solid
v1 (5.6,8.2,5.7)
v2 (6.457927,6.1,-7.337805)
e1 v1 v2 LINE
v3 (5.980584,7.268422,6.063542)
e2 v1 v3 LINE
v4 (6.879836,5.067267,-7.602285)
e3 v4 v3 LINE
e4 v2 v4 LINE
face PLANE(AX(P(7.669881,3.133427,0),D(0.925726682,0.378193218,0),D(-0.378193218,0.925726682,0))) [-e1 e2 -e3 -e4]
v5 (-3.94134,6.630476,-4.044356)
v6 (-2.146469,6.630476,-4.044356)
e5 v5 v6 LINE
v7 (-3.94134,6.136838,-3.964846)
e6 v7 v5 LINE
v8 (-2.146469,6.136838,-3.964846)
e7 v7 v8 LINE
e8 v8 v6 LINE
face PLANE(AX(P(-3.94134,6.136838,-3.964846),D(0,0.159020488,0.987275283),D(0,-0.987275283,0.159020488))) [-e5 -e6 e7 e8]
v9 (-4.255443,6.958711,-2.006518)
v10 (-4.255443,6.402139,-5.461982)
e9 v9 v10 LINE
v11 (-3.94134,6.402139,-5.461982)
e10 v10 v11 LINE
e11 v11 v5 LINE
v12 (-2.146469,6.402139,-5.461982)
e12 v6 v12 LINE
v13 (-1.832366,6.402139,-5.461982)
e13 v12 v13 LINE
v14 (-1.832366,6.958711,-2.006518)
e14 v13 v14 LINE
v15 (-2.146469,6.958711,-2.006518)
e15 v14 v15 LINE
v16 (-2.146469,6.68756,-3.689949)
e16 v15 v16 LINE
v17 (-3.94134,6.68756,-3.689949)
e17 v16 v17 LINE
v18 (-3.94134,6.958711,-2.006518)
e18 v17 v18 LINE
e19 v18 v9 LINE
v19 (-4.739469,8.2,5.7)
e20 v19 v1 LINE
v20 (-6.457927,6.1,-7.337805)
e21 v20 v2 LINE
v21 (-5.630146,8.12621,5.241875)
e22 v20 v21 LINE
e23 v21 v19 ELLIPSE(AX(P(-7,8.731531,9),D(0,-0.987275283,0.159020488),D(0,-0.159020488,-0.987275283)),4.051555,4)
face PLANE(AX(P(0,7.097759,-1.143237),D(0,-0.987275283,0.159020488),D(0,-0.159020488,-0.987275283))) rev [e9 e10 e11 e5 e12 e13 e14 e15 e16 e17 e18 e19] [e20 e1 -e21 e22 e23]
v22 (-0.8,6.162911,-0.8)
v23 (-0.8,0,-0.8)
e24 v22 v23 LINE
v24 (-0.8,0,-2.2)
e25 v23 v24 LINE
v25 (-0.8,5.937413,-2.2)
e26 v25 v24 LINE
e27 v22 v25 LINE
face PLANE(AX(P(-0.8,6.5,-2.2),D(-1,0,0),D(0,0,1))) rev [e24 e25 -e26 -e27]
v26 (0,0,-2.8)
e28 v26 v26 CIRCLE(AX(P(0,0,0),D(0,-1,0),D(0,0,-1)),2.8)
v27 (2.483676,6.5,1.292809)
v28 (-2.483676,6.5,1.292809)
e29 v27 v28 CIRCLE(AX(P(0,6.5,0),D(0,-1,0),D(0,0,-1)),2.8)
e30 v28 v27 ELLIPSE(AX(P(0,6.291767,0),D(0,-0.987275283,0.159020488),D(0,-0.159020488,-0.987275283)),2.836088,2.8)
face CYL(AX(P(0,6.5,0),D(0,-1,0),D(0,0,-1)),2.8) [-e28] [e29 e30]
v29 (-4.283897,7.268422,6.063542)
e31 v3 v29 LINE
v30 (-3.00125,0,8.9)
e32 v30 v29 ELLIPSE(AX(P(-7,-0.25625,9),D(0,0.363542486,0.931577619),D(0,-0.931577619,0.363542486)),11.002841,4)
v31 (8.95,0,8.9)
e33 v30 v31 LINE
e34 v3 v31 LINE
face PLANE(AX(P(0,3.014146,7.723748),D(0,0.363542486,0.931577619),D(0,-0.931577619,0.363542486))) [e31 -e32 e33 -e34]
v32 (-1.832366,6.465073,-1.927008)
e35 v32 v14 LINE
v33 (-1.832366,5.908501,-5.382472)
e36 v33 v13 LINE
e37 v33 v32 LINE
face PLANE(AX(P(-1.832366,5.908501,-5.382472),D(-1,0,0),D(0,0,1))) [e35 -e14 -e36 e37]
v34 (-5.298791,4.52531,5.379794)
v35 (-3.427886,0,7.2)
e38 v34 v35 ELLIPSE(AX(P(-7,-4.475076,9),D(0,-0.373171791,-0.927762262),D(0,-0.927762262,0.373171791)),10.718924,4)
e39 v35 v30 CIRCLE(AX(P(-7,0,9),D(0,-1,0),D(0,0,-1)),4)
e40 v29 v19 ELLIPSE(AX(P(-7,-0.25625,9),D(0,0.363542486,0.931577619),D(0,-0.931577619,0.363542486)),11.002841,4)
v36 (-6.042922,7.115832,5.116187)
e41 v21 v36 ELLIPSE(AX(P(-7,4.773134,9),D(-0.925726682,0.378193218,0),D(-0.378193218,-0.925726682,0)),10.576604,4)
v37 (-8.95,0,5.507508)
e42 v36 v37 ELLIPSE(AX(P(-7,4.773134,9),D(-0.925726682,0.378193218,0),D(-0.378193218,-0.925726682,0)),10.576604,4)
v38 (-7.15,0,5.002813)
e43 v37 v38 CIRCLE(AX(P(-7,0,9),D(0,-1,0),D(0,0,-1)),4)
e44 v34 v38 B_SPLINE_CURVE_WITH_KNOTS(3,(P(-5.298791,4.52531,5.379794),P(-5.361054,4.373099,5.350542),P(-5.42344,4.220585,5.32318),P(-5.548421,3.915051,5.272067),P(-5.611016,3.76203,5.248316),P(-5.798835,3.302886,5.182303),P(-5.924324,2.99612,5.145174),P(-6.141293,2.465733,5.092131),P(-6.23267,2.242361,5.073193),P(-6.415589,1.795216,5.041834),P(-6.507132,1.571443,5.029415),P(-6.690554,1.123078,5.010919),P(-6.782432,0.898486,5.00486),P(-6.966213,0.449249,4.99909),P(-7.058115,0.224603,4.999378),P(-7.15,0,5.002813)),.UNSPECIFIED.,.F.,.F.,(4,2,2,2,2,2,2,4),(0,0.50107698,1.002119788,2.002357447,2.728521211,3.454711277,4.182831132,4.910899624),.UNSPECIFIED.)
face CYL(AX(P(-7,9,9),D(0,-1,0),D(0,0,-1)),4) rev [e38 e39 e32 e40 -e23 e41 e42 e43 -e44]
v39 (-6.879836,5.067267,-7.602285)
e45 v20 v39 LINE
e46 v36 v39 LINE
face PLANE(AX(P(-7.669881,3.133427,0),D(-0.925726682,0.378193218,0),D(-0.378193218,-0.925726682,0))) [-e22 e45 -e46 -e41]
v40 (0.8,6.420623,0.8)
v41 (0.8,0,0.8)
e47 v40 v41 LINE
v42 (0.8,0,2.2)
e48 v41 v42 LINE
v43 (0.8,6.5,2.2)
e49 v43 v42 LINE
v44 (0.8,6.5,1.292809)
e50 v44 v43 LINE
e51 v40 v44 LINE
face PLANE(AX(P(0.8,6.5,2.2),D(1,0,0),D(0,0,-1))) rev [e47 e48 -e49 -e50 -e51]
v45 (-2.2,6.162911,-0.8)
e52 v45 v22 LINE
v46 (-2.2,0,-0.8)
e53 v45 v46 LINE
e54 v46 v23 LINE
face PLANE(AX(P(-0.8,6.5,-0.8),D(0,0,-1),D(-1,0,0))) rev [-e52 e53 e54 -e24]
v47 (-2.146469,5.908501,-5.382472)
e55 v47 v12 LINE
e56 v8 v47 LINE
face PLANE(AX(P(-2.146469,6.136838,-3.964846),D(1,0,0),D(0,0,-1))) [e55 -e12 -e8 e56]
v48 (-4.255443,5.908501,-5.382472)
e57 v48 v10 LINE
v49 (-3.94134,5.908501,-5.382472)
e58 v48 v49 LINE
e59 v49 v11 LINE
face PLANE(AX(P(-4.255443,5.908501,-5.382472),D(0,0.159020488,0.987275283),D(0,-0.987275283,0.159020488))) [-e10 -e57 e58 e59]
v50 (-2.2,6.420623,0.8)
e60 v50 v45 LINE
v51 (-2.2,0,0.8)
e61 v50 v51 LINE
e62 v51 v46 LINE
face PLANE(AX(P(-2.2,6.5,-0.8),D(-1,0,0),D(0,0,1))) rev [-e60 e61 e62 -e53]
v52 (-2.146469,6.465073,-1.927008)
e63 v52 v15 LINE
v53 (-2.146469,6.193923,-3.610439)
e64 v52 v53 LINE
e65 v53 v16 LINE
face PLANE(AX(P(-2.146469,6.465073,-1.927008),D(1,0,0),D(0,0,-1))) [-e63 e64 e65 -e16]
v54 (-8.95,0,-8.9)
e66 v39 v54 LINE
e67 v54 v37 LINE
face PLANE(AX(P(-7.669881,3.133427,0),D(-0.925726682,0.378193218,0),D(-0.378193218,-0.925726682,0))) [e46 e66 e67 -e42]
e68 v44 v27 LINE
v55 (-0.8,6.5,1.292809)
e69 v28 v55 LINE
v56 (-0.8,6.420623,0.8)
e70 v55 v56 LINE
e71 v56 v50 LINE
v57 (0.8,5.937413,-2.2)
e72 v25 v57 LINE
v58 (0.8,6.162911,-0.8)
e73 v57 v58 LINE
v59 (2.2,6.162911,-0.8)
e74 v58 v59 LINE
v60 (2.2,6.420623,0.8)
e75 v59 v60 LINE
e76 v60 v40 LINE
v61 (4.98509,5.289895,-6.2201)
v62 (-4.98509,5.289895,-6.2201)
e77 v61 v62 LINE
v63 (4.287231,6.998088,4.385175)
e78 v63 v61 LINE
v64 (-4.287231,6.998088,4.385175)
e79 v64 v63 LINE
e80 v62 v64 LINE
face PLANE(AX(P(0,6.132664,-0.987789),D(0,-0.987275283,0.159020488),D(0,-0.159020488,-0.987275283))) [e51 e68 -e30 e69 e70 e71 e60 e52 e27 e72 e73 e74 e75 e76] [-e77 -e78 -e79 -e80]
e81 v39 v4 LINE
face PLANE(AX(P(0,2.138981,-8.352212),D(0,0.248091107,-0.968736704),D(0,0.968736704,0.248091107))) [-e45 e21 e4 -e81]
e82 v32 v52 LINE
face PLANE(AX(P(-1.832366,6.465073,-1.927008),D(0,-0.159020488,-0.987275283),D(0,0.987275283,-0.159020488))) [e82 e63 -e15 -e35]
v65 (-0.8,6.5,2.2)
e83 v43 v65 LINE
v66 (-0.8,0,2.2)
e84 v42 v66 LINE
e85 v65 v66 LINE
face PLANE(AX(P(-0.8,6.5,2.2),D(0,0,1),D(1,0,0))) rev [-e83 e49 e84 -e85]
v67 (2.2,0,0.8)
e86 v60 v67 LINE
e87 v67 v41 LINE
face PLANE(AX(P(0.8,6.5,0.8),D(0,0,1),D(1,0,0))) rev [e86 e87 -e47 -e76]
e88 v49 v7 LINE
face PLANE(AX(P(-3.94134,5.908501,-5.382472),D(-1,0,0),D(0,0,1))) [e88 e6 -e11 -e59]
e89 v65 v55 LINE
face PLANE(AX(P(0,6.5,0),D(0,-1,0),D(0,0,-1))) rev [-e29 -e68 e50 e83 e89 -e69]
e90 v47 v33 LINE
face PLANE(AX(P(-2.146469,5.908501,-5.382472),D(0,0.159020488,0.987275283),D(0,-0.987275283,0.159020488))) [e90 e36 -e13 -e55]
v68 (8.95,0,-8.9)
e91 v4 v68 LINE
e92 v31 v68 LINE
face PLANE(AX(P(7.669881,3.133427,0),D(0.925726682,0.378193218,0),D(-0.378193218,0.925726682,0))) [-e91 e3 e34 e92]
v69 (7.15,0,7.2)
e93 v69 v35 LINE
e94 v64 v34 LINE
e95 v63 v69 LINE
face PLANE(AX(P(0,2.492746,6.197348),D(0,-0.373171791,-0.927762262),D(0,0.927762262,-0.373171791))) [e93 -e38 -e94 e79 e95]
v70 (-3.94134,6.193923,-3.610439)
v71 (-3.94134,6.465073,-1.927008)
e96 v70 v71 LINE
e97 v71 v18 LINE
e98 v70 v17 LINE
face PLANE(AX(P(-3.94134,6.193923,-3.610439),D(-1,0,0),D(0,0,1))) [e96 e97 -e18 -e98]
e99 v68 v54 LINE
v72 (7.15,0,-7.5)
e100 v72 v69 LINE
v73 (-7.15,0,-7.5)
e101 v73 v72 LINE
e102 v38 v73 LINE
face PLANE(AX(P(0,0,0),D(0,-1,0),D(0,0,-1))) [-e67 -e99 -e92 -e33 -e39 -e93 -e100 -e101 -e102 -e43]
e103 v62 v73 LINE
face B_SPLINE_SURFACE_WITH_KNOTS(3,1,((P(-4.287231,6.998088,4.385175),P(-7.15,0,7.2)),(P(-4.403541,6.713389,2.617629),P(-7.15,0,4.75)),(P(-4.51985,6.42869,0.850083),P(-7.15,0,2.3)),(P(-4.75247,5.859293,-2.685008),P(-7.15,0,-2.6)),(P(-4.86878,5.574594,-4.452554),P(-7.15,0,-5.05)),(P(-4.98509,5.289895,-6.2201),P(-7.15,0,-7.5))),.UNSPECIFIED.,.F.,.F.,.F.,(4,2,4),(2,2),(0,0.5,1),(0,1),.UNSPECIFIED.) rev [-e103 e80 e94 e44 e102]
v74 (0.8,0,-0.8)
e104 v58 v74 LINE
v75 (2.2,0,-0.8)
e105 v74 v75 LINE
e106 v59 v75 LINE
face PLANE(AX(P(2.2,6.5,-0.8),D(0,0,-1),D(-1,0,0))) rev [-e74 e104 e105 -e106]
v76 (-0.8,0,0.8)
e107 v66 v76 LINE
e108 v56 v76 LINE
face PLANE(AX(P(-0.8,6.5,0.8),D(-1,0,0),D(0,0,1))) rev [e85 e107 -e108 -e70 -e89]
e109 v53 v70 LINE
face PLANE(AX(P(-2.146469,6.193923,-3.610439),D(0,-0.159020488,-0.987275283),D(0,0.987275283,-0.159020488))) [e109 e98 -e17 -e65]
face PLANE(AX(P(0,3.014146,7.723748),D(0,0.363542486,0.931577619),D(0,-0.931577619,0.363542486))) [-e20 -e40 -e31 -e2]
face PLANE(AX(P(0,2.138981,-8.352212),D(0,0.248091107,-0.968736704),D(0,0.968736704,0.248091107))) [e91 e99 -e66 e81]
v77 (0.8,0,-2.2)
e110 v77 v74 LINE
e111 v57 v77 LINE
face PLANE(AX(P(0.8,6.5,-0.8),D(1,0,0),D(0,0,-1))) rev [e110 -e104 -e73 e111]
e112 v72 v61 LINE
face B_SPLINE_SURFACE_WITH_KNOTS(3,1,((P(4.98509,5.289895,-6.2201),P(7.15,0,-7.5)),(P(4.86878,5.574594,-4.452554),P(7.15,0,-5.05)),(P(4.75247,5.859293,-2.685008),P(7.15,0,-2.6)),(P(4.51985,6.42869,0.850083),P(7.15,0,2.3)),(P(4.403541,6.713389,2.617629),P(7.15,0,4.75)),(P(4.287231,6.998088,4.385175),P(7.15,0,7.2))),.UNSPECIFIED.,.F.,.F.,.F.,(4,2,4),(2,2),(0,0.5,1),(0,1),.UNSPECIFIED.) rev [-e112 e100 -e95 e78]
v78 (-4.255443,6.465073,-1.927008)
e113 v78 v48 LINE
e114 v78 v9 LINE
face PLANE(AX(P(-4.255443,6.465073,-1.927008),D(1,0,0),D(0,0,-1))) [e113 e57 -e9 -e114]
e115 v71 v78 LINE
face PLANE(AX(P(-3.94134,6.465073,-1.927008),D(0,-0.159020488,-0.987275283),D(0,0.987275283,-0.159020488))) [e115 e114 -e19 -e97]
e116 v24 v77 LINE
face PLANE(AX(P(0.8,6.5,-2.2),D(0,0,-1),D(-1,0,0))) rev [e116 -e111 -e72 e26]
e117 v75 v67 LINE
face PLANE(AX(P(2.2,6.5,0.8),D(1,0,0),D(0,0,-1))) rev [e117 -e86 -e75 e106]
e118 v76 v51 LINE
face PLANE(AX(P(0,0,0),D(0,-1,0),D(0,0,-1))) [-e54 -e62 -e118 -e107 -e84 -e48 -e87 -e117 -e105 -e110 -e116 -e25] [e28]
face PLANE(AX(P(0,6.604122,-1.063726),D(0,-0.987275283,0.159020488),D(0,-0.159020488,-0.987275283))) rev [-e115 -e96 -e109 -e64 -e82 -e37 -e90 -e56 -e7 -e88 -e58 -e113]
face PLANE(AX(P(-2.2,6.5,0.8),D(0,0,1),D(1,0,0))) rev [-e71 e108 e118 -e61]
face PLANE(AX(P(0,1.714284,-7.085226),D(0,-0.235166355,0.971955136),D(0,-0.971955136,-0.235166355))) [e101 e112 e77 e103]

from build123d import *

# Parameters (mm, degrees)
OTHER_START         = 7.189240539
OTHER_2_OUTLINE_W   = 16
OTHER_2_OUTLINE_H   = 16
OTHER_2_DEPTH       = 1.9877561
SKETCH_20_R         = 2.8
EXTRUDE_2_DEPTH     = 6.5
SKETCH_22_R         = 4
CUT_EXTRUDE_2_DEPTH = 9
CUT_EXTRUDE_3_DEPTH = 0.5


# Read off the part's stored shape, not the designer's step: 相交2
with BuildPart() as part:
    # 草图4 → Loft 1 section 0
    with BuildSketch(Plane(origin=(0, 8.2, 0), x_dir=(1, 0, 0), z_dir=(0, 1, 0))):
        with BuildLine():
            Line((-5.6, 6.8), (5.6, 6.8))
            Line((5.6, 6.8), (5.6, -5.7))
            Line((5.6, -5.7), (-5.6, -5.7))
            Line((-5.6, -5.7), (-5.6, 6.8))
        make_face()
    # 草图1 → Loft 1 section 1
    with BuildSketch(Plane(origin=(0, 0, 0), x_dir=(1, 0, 0), z_dir=(0, 1, 0))):
        with BuildLine():
            Line((-8.95, -8.9), (8.95, -8.9))
            Line((8.95, -8.9), (8.95, 8.9))
            Line((8.95, 8.9), (-8.95, 8.9))
            Line((-8.95, 8.9), (-8.95, -8.9))
        make_face()
    loft()

    # 相交2 outline → 相交2 (cut)
    with BuildSketch(Plane(origin=(0, 0, 0), x_dir=(1, 0, 0), z_dir=(0, 0.9872752829851917, -0.15902048800865198)).offset(OTHER_START)):
        Rectangle(OTHER_2_OUTLINE_W, OTHER_2_OUTLINE_H)
    extrude(amount=OTHER_2_DEPTH, mode=Mode.SUBTRACT)

    # 草图19 → Loft 1 2 section 0
    with BuildSketch(Plane(origin=(0, 6.132664073, -0.987788564), x_dir=(1, 0, 0), z_dir=(0, 0.9872752829851916, -0.15902048800865207))):
        with BuildLine():
            Line((-4.985089723, 5.299749211), (4.985089723, 5.299749211))
            Line((4.985089723, 5.299749211), (4.287230721, -5.442213697))
            Line((4.287230721, -5.442213697), (-4.287230721, -5.442213697))
            Line((-4.287230721, -5.442213697), (-4.985089723, 5.299749211))
        make_face()
    # 草图8 → Loft 1 2 section 1
    with BuildSketch(Plane.XZ):
        with BuildLine():
            Line((-7.15, 7.2), (7.15, 7.2))
            Line((7.15, 7.2), (7.15, -7.5))
            Line((7.15, -7.5), (-7.15, -7.5))
            Line((-7.15, -7.5), (-7.15, 7.2))
        make_face()
    loft(mode=Mode.SUBTRACT)

    # 草图20 → 凸台-拉伸2 (add)
    with BuildSketch(Plane.XZ):
        with Locations(Location((0, 0, 0), (0, 0, 270))):
            Circle(SKETCH_20_R)
        Polygon((-2.2, 0.8), (-0.8, 0.8), (-0.8, 2.2), (0.8, 2.2), (0.8, 0.8), (2.2, 0.8), (2.2, -0.8), (0.8, -0.8), (0.8, -2.2), (-0.8, -2.2), (-0.8, -0.8), (-2.2, -0.8), align=None, mode=Mode.SUBTRACT)
    extrude(amount=-EXTRUDE_2_DEPTH)

    # 草图22 → 切除-拉伸2 (cut)
    with BuildSketch(Plane.XZ):
        with Locations((-7, 9)):
            Circle(SKETCH_22_R)
    extrude(amount=-CUT_EXTRUDE_2_DEPTH, mode=Mode.SUBTRACT)

    # 草图23 → 切除-拉伸3 (cut)
    with BuildSketch(Plane(origin=(0, 7.097759487, -1.143236539), x_dir=(1, 0, 0), z_dir=(0, 0.9872752829851916, -0.15902048800865207))):
        Polygon((-4.255442902, 4.374408411), (-3.941340338, 4.374408411), (-3.941340338, 2.938510975), (-2.146468543, 2.938510975), (-2.146468543, 4.374408411), (-1.832365979, 4.374408411), (-1.832365979, 0.874408411), (-2.146468543, 0.874408411), (-2.146468543, 2.579536616), (-3.941340338, 2.579536616), (-3.941340338, 0.874408411), (-4.255442902, 0.874408411), align=None)
    extrude(amount=-CUT_EXTRUDE_3_DEPTH, mode=Mode.SUBTRACT)


solid = part.part
